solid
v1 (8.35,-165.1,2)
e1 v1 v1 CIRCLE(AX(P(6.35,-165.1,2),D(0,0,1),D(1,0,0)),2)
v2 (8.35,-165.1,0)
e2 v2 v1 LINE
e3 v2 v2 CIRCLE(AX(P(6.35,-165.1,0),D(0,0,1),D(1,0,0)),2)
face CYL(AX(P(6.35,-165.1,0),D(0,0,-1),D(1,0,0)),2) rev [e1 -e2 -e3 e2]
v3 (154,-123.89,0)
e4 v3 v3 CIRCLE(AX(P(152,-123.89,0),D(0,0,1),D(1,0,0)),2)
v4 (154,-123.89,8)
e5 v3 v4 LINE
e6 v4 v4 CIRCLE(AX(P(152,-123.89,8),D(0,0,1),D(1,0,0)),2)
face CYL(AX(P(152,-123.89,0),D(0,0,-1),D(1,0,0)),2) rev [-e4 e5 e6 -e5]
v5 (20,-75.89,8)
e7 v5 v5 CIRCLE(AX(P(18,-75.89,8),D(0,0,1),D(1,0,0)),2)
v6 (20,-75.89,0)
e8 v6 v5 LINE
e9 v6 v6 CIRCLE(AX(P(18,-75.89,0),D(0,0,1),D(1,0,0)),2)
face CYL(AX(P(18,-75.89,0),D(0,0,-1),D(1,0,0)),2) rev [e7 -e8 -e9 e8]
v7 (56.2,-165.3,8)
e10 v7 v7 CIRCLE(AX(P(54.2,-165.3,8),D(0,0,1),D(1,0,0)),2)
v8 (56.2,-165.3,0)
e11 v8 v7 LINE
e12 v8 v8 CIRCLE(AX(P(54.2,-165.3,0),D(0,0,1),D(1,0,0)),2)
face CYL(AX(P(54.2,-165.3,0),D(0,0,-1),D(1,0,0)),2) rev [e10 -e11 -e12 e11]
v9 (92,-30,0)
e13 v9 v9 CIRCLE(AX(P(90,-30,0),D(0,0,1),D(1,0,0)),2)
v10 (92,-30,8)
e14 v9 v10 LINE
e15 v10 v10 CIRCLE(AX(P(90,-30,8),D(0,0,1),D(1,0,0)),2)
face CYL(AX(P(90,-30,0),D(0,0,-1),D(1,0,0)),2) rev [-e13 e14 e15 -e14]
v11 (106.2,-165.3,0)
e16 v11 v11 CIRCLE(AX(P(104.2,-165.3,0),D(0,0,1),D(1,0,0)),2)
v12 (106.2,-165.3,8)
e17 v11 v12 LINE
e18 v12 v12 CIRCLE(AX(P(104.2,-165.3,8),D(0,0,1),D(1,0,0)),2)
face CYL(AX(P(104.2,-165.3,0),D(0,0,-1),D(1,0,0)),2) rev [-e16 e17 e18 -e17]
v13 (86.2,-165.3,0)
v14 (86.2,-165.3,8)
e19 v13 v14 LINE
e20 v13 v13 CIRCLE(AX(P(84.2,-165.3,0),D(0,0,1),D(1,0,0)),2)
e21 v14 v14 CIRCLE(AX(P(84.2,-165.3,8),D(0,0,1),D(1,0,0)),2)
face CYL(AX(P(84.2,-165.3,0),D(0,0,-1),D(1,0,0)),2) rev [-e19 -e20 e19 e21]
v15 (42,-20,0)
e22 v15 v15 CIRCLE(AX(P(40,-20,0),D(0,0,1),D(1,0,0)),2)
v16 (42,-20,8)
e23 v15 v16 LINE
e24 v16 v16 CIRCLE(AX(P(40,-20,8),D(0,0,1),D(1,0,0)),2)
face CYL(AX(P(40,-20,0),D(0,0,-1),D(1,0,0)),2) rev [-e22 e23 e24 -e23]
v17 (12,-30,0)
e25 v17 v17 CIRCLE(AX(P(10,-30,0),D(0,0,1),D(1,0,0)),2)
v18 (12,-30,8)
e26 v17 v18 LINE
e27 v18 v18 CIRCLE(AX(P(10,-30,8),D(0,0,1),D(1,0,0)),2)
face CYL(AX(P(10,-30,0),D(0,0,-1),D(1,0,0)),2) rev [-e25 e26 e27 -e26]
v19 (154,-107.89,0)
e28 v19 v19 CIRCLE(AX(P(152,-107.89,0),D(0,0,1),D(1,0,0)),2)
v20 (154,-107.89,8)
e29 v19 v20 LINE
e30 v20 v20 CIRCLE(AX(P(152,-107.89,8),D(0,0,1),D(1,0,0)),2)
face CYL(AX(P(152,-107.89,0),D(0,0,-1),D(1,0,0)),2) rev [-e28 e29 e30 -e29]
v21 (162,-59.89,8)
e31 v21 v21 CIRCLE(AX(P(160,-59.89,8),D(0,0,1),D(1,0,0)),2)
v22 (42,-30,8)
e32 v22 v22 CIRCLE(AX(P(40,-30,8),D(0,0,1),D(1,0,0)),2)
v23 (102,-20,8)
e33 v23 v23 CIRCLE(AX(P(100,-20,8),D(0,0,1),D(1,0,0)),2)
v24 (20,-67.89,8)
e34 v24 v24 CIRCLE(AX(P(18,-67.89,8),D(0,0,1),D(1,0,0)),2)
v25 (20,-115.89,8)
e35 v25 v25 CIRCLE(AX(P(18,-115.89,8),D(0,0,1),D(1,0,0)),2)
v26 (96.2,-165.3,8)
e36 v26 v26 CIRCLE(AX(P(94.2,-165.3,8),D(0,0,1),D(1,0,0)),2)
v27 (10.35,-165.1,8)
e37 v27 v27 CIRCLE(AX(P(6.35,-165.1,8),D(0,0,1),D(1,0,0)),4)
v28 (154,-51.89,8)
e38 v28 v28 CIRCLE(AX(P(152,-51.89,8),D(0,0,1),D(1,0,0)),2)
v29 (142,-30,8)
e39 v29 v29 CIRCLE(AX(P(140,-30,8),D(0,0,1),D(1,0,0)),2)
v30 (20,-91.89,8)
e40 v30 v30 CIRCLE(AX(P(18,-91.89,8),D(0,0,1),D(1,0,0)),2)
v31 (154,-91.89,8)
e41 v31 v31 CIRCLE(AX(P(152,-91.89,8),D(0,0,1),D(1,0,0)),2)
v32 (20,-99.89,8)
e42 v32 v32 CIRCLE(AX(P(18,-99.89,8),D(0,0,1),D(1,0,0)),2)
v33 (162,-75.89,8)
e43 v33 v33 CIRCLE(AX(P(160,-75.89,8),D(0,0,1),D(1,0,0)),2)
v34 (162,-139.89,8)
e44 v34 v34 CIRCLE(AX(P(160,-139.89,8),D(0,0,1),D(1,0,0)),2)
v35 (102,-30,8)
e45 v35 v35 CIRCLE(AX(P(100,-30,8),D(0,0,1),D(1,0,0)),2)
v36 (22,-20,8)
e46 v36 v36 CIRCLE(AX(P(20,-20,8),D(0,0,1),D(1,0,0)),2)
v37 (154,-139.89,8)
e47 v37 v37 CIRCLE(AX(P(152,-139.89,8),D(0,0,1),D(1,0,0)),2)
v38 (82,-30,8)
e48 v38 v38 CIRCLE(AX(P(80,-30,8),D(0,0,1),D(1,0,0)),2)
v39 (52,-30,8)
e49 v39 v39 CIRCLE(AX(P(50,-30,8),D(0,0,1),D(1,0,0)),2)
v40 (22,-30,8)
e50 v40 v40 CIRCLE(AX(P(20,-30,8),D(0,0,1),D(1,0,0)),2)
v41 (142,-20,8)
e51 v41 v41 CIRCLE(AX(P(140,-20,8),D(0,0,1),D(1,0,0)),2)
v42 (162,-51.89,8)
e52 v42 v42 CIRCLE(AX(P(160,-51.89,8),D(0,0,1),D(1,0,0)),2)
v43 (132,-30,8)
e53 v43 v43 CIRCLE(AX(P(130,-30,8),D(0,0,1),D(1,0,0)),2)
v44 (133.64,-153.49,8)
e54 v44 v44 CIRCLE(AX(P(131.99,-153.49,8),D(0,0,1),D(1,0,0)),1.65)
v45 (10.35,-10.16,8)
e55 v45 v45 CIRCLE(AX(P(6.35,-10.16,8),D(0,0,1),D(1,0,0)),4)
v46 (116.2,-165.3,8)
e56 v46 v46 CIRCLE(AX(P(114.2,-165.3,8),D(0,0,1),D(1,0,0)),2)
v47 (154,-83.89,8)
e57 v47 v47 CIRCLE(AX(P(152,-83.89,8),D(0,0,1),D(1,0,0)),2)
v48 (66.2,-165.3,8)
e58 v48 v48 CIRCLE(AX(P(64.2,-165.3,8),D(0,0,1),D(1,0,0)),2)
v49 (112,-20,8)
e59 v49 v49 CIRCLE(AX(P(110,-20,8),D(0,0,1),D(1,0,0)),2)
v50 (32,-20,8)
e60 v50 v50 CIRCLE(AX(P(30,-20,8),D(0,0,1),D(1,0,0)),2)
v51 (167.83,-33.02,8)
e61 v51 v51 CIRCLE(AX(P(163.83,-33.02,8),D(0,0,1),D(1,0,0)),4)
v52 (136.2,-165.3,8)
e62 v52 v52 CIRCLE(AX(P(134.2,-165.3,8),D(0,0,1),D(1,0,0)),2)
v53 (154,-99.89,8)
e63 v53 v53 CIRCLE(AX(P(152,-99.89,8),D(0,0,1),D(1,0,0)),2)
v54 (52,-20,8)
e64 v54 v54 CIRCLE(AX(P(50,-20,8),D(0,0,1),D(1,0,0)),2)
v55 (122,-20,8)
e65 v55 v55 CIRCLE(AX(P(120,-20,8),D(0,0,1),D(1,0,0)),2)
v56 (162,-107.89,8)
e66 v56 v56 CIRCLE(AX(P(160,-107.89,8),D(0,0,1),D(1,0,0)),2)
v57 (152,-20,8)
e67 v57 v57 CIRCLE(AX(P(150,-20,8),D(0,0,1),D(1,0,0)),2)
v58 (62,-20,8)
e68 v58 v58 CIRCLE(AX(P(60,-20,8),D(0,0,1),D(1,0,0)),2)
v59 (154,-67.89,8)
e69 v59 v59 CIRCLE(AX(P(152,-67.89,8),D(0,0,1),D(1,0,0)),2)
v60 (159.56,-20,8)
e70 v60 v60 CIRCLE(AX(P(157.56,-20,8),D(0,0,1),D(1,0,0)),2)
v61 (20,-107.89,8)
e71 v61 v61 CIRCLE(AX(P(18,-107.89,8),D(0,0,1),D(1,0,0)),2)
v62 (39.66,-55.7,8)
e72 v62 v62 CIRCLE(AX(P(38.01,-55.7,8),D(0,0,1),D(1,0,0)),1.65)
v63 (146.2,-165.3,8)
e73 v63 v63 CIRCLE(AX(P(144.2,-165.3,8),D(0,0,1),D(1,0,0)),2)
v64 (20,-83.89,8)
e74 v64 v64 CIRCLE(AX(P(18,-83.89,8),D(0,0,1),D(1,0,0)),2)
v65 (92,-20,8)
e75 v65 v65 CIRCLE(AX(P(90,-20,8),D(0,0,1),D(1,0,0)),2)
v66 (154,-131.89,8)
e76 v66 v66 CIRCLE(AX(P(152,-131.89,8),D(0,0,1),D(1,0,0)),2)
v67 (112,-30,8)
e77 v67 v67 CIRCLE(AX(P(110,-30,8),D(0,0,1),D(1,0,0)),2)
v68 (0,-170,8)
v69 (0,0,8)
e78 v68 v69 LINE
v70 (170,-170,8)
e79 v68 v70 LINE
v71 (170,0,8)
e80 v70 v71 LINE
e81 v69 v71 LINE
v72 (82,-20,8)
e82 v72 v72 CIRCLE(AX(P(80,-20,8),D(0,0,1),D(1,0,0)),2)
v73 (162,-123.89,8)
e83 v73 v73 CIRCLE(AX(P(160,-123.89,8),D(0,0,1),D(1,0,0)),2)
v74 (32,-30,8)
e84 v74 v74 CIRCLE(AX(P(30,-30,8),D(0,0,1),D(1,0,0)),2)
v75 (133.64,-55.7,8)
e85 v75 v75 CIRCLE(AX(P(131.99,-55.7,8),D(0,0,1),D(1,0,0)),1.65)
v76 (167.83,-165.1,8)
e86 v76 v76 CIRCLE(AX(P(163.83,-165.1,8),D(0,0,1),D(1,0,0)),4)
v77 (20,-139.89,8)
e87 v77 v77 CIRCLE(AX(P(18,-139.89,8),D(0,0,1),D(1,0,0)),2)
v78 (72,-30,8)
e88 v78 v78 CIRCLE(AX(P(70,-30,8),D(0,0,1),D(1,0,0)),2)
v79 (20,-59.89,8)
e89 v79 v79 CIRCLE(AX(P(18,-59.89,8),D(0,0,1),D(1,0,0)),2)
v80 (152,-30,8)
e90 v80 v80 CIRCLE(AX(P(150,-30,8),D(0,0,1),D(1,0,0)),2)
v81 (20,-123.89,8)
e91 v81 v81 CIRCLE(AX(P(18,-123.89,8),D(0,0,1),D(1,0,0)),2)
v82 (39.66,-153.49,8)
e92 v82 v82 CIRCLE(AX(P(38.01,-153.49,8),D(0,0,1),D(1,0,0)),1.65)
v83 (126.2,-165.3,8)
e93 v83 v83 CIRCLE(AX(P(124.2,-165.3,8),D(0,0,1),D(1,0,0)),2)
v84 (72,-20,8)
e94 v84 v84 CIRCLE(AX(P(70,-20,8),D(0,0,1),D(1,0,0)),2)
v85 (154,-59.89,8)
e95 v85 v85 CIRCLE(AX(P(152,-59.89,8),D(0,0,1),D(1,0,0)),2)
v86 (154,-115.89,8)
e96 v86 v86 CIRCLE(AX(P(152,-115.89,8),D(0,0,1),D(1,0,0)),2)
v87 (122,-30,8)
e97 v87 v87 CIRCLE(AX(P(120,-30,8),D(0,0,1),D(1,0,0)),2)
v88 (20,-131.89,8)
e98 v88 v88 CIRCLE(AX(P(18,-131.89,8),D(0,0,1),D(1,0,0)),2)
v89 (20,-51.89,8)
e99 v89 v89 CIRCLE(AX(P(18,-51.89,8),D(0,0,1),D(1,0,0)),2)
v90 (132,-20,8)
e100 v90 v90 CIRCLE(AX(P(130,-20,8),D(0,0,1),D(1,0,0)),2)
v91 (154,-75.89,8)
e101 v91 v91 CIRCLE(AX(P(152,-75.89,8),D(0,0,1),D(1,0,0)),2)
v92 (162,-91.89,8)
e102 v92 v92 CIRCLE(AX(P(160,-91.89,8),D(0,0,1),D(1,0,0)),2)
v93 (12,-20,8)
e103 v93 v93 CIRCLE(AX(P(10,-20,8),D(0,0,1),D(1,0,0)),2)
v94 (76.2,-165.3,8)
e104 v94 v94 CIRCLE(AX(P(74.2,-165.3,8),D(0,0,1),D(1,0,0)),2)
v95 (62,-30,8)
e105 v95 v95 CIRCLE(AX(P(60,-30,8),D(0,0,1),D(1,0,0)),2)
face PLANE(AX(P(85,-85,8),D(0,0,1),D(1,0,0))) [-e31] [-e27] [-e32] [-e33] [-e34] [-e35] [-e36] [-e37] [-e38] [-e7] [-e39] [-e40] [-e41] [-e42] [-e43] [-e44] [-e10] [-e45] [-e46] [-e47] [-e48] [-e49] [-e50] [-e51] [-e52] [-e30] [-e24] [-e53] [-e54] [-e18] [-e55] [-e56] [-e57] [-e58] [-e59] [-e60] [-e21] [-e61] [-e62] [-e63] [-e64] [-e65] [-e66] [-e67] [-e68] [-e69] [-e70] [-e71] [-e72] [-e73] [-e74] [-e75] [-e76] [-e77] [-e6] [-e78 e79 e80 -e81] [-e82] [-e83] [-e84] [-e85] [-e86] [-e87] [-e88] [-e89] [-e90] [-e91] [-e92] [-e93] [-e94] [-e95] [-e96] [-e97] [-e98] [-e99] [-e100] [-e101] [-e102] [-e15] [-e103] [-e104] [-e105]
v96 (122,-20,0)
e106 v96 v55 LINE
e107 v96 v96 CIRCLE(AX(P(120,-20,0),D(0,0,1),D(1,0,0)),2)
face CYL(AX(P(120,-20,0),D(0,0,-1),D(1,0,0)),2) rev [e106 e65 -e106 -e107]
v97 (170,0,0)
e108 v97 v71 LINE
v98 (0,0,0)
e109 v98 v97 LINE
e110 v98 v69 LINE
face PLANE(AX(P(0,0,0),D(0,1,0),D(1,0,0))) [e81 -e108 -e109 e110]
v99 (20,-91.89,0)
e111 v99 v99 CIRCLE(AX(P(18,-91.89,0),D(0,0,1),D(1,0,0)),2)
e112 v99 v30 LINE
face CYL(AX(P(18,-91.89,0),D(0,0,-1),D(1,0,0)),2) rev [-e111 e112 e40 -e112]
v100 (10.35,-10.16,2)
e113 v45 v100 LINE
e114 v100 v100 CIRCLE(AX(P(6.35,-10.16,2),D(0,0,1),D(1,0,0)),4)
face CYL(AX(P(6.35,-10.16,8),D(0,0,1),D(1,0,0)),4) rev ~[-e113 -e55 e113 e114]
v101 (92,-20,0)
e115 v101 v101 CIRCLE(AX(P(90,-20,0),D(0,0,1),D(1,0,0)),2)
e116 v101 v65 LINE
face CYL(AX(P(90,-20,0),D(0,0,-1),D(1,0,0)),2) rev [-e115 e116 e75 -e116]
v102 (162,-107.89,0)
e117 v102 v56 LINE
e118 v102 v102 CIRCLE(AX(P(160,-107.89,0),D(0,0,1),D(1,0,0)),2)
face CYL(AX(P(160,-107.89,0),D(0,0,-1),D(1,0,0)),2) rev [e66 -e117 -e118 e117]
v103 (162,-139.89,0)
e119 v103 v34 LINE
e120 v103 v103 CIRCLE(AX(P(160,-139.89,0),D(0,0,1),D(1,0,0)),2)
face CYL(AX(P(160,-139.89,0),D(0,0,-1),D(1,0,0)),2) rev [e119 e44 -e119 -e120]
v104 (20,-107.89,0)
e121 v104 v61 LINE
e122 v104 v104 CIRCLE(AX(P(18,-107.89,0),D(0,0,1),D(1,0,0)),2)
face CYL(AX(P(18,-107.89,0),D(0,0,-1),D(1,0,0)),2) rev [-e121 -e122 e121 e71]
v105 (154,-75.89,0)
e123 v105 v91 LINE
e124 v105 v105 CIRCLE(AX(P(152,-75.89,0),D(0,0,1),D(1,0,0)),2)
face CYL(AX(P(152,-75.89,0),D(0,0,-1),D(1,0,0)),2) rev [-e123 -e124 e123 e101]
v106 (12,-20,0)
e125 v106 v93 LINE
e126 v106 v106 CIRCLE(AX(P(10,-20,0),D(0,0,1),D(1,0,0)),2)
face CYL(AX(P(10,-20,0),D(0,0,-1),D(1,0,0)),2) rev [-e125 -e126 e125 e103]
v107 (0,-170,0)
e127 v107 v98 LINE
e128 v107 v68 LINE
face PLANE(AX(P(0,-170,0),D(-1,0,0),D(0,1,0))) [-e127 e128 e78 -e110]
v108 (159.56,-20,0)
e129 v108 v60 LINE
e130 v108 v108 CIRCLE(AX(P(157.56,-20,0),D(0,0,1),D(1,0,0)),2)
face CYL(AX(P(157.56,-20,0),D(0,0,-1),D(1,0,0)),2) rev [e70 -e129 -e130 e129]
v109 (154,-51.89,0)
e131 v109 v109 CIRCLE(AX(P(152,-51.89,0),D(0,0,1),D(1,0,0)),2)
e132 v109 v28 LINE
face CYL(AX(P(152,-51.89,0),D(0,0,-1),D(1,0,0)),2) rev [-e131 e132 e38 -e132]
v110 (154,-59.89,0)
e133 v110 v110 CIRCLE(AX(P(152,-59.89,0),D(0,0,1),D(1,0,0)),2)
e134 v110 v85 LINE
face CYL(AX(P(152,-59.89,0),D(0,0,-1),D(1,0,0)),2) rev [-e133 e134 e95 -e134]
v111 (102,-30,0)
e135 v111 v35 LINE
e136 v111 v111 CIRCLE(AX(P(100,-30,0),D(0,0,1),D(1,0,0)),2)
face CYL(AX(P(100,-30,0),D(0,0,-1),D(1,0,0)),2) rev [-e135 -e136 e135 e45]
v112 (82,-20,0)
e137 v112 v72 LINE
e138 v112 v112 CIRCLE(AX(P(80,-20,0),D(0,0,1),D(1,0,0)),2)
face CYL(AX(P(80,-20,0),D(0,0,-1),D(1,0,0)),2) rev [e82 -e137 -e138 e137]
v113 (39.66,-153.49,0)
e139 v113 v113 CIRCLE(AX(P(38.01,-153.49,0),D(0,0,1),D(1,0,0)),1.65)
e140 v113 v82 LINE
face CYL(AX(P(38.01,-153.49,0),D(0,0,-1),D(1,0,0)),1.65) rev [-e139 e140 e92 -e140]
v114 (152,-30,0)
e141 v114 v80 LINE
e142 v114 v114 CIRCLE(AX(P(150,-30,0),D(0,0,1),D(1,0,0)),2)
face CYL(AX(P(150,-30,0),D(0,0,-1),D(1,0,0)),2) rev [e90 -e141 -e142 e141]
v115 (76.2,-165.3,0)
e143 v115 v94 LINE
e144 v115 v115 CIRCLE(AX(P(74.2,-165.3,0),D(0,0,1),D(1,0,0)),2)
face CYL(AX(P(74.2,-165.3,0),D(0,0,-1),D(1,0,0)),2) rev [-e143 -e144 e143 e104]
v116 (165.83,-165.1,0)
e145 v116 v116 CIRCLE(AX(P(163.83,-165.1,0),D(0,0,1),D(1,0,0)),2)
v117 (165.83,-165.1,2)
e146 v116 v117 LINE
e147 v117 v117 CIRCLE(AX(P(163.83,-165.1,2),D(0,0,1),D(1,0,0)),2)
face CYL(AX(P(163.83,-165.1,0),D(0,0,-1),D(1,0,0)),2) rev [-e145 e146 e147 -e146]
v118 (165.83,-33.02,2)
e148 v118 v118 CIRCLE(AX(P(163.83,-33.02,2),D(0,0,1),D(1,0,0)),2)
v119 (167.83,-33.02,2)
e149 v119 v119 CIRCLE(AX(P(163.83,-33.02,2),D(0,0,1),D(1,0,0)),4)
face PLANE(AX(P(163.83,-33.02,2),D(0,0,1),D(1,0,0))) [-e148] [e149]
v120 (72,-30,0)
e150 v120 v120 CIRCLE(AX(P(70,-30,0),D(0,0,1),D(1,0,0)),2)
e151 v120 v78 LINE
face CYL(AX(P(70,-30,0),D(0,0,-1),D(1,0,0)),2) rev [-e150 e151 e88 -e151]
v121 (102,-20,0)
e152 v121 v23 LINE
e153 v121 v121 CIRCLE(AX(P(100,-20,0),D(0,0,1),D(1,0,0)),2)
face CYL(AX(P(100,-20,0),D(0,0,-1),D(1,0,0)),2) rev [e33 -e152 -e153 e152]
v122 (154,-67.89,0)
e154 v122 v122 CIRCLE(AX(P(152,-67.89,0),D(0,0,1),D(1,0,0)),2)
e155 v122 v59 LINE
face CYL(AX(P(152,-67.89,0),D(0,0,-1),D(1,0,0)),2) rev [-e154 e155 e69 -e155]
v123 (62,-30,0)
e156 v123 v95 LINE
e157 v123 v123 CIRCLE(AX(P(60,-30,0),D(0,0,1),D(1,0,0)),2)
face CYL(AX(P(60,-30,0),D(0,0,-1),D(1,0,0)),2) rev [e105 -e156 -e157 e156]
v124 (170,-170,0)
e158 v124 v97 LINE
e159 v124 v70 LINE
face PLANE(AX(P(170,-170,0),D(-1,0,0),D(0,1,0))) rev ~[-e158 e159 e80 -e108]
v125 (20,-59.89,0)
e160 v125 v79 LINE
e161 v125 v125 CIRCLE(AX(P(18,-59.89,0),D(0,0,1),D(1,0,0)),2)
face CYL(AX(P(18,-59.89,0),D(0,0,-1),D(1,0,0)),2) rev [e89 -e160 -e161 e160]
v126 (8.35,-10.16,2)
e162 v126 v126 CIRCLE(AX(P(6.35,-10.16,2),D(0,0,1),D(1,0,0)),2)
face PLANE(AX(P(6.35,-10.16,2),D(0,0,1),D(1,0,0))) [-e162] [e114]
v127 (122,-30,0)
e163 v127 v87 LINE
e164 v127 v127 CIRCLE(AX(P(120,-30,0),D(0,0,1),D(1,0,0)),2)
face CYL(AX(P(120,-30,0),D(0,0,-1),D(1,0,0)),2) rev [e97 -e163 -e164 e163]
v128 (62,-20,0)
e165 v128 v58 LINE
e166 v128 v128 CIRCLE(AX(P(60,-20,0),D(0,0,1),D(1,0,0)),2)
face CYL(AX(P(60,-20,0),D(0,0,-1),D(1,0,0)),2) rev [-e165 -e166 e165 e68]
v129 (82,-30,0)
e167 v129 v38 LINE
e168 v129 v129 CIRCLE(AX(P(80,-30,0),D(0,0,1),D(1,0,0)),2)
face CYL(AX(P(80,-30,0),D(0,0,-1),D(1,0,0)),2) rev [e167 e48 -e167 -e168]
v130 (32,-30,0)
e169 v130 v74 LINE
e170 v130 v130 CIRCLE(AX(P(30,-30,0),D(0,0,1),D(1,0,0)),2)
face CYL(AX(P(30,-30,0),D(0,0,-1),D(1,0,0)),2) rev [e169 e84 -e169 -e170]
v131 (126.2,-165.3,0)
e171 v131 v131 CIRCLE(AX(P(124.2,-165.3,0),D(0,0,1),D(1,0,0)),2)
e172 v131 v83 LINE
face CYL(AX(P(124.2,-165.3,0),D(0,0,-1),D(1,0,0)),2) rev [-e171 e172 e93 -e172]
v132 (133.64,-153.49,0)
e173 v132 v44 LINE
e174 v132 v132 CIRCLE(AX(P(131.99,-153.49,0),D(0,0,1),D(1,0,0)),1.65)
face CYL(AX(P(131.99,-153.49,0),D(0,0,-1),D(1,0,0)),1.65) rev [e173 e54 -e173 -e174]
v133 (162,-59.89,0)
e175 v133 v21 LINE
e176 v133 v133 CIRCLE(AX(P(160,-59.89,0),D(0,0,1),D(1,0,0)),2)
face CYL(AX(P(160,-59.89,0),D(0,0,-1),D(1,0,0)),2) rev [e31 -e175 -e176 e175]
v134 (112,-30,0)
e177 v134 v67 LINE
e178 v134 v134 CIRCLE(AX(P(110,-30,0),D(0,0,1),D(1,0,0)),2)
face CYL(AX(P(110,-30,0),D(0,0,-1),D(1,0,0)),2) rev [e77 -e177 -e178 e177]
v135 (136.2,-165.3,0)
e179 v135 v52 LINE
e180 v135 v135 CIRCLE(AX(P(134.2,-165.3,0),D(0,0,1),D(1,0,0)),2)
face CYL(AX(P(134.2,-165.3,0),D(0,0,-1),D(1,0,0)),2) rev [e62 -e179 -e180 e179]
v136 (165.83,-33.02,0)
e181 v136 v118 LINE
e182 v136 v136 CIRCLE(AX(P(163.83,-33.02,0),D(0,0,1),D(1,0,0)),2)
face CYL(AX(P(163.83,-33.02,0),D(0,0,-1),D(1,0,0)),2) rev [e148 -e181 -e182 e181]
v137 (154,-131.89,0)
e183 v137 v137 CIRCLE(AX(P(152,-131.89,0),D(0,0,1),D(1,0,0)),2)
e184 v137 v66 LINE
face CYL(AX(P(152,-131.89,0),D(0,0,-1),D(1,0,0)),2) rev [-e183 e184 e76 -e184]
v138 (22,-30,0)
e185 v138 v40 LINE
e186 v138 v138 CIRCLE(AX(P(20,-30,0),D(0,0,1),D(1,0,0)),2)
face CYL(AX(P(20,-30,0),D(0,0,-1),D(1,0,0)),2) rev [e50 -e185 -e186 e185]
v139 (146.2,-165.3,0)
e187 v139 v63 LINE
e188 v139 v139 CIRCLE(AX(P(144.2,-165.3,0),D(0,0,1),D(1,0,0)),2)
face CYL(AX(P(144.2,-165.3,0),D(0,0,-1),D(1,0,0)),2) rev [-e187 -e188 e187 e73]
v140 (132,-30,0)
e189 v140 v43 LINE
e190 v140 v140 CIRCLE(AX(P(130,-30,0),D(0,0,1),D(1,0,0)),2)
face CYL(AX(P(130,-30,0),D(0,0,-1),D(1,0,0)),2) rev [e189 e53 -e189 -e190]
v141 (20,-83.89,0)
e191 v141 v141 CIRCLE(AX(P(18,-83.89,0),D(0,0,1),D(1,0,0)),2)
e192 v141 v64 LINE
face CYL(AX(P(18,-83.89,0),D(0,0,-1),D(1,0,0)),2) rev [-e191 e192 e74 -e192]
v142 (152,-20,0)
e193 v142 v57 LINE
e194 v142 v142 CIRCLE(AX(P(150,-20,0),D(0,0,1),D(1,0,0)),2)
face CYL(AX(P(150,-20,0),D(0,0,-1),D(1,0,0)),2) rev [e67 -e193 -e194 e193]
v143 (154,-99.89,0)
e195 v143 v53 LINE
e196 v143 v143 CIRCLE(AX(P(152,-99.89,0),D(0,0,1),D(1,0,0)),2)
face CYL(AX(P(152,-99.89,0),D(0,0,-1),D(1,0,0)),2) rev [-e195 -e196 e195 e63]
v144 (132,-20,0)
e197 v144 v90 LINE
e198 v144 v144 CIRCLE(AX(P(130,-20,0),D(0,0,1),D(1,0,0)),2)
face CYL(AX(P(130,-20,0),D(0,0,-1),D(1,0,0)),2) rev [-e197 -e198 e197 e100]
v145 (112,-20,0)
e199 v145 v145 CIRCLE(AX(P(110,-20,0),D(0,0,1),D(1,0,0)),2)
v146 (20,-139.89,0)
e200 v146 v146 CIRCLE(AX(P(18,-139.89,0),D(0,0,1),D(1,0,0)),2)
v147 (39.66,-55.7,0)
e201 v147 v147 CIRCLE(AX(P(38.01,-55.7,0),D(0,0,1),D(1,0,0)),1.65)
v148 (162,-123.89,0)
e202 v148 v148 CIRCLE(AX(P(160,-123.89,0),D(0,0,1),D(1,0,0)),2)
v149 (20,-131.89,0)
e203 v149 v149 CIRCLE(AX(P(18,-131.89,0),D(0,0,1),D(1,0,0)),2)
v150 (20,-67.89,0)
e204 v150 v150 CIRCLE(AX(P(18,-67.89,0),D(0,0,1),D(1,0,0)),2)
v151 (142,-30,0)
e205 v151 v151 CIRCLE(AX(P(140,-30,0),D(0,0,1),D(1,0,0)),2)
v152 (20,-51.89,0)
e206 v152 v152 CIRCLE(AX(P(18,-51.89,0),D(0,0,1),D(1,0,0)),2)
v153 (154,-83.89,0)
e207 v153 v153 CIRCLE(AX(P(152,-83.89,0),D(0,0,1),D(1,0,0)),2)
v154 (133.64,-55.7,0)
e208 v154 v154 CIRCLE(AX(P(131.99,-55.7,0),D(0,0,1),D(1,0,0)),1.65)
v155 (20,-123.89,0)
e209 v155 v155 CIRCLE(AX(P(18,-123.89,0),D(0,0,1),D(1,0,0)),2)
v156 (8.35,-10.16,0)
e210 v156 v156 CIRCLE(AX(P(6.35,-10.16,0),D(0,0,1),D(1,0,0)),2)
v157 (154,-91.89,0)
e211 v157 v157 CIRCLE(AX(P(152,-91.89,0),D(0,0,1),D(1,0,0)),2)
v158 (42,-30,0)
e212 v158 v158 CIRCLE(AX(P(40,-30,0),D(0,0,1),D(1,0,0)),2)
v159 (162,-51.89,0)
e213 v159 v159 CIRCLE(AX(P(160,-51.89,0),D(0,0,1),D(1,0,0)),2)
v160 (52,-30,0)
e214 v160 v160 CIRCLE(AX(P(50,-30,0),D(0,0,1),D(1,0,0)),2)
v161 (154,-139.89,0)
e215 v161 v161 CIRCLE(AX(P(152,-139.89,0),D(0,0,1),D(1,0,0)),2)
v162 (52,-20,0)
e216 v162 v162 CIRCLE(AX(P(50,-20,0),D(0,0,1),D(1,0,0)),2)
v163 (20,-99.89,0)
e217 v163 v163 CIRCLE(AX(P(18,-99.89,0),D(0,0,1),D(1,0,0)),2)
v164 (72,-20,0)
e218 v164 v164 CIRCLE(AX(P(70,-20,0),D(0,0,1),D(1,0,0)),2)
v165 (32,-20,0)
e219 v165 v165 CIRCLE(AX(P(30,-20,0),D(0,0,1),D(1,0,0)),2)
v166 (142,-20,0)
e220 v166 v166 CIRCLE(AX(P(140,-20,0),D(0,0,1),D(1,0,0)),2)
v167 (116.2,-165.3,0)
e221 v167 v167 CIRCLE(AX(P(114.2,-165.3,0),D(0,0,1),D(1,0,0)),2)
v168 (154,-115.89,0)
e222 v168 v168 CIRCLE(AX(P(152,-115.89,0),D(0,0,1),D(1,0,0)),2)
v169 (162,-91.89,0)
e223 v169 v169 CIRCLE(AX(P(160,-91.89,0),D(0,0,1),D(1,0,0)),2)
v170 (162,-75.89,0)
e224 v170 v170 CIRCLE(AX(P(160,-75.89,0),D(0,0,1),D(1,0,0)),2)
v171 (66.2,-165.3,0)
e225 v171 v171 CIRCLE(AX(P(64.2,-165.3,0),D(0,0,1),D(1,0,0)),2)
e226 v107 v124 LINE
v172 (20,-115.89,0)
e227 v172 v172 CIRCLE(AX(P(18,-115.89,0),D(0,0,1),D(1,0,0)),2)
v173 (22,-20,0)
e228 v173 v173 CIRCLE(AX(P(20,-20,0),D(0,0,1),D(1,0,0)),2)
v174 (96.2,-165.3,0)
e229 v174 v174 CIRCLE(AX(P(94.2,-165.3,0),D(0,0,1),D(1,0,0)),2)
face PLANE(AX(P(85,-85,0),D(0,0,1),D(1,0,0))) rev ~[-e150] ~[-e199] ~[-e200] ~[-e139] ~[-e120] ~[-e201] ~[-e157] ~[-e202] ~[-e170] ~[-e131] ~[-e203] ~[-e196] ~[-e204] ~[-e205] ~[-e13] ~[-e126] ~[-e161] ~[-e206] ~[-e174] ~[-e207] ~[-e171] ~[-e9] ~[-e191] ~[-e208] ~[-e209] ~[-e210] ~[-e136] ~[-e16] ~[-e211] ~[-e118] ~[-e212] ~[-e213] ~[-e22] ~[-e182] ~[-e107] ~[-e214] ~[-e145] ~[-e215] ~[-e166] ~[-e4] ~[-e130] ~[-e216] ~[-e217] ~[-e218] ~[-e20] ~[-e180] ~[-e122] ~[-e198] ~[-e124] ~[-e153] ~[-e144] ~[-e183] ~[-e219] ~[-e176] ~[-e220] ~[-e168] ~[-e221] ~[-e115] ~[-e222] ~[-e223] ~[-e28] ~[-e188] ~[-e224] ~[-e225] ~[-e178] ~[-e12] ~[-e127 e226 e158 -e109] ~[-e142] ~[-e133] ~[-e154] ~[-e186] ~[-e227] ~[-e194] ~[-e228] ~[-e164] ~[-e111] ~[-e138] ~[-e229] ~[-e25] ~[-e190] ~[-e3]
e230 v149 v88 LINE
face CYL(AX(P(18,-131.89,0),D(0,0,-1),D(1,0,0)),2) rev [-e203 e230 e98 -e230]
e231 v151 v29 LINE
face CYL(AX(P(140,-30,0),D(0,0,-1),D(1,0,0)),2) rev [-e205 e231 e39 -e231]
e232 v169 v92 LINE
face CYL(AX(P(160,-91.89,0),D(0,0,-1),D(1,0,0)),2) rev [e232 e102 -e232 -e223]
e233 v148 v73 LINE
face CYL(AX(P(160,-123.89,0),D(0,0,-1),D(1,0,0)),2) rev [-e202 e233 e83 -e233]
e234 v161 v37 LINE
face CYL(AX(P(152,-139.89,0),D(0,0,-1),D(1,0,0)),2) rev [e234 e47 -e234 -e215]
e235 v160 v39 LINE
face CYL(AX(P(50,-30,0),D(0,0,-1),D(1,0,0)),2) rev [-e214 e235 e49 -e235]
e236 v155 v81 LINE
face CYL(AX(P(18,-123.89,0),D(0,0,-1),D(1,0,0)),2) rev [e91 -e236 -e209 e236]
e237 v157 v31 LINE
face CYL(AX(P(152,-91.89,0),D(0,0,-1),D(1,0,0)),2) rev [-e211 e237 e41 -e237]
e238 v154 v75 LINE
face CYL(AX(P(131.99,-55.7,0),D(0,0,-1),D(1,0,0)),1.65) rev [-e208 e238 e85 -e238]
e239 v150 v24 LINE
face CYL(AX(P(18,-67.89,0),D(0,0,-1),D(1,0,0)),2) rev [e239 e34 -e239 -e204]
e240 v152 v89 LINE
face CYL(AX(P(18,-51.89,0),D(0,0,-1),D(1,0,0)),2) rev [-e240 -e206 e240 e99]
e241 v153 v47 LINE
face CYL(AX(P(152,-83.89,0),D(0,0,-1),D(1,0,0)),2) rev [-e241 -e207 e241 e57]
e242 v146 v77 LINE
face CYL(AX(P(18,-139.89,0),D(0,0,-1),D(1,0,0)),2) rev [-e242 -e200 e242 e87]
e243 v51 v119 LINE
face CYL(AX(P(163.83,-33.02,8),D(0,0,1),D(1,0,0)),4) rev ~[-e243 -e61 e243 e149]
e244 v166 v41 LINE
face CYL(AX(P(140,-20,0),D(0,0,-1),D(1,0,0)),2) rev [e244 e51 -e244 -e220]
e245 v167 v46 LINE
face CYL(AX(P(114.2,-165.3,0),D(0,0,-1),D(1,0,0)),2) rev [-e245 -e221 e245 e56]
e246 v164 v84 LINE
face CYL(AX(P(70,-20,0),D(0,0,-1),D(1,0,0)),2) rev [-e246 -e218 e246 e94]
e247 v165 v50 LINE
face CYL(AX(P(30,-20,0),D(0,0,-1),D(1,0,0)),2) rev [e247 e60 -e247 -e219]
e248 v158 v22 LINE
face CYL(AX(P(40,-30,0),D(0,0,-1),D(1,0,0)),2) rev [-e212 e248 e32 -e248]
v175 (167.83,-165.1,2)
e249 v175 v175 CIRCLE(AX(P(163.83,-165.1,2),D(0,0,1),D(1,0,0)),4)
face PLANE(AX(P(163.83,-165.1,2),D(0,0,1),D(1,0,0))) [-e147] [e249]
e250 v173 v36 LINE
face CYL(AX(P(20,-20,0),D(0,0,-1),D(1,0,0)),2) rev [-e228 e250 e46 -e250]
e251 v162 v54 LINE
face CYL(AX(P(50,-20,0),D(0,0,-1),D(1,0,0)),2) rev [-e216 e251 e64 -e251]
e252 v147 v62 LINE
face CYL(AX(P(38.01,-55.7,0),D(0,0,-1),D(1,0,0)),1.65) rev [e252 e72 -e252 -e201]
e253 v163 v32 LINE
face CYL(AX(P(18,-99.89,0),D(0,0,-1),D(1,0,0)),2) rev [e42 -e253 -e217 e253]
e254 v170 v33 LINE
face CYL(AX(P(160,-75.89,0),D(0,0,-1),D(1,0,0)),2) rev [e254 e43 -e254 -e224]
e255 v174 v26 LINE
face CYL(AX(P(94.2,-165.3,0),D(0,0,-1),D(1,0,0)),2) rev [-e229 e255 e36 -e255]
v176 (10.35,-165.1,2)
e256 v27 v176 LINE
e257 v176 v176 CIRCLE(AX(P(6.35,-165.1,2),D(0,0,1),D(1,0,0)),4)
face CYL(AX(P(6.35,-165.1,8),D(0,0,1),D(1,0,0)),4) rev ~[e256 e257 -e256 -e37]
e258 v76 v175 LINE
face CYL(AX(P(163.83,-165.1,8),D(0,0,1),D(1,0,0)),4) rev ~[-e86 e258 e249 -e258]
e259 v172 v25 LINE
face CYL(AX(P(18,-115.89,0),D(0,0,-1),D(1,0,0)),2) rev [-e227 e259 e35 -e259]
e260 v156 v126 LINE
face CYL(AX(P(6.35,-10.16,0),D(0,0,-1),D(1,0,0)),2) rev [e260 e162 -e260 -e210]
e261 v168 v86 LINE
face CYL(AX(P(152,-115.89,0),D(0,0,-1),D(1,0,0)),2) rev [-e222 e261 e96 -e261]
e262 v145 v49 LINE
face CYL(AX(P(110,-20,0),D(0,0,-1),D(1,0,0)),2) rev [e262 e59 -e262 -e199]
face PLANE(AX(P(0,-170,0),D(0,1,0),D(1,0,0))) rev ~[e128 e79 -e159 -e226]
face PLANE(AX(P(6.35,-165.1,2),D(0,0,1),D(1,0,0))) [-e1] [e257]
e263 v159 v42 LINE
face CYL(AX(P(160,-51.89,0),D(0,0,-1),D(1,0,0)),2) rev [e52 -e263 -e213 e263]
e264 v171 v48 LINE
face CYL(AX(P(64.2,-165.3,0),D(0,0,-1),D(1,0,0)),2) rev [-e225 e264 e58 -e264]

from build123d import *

# Parameters (mm, degrees)
F0_W     = 170
F0_H     = 170
F0_R     = 2
F0_R_2   = 1.65
F1_DEPTH = 8
F2_R     = 4
F2_R_2   = 2
F3_DEPTH = 6


with BuildPart() as f1:
    # F0 (on Top) → F1 (new body)
    with BuildSketch(Plane.XY):
        with Locations((85, -85)):
            Rectangle(F0_W, F0_H)
        with Locations((6.35, -165.1)):
            Circle(F0_R, mode=Mode.SUBTRACT)
        with Locations((18, -139.89)):
            Circle(F0_R, mode=Mode.SUBTRACT)
        with Locations((18, -131.89)):
            Circle(F0_R, mode=Mode.SUBTRACT)
        with Locations((54.2, -165.3)):
            Circle(F0_R, mode=Mode.SUBTRACT)
        with Locations((64.2, -165.3)):
            Circle(F0_R, mode=Mode.SUBTRACT)
        with Locations((74.2, -165.3)):
            Circle(F0_R, mode=Mode.SUBTRACT)
        with Locations((38.01, -153.49)):
            Circle(F0_R_2, mode=Mode.SUBTRACT)
        with Locations((18, -123.89)):
            Circle(F0_R, mode=Mode.SUBTRACT)
        with Locations((18, -115.89)):
            Circle(F0_R, mode=Mode.SUBTRACT)
        with Locations((18, -107.89)):
            Circle(F0_R, mode=Mode.SUBTRACT)
        with Locations((18, -99.89)):
            Circle(F0_R, mode=Mode.SUBTRACT)
        with Locations((18, -91.89)):
            Circle(F0_R, mode=Mode.SUBTRACT)
        with Locations((18, -83.89)):
            Circle(F0_R, mode=Mode.SUBTRACT)
        with Locations((84.2, -165.3)):
            Circle(F0_R, mode=Mode.SUBTRACT)
        with Locations((94.2, -165.3)):
            Circle(F0_R, mode=Mode.SUBTRACT)
        with Locations((104.2, -165.3)):
            Circle(F0_R, mode=Mode.SUBTRACT)
        with Locations((114.2, -165.3)):
            Circle(F0_R, mode=Mode.SUBTRACT)
        with Locations((124.2, -165.3)):
            Circle(F0_R, mode=Mode.SUBTRACT)
        with Locations((134.2, -165.3)):
            Circle(F0_R, mode=Mode.SUBTRACT)
        with Locations((131.99, -153.49)):
            Circle(F0_R_2, mode=Mode.SUBTRACT)
        with Locations((144.2, -165.3)):
            Circle(F0_R, mode=Mode.SUBTRACT)
        with Locations((163.83, -165.1)):
            Circle(F0_R, mode=Mode.SUBTRACT)
        with Locations((152, -139.89)):
            Circle(F0_R, mode=Mode.SUBTRACT)
        with Locations((152, -131.89)):
            Circle(F0_R, mode=Mode.SUBTRACT)
        with Locations((160, -139.89)):
            Circle(F0_R, mode=Mode.SUBTRACT)
        with Locations((152, -123.89)):
            Circle(F0_R, mode=Mode.SUBTRACT)
        with Locations((160, -123.89)):
            Circle(F0_R, mode=Mode.SUBTRACT)
        with Locations((152, -115.89)):
            Circle(F0_R, mode=Mode.SUBTRACT)
        with Locations((152, -107.89)):
            Circle(F0_R, mode=Mode.SUBTRACT)
        with Locations((160, -107.89)):
            Circle(F0_R, mode=Mode.SUBTRACT)
        with Locations((152, -99.89)):
            Circle(F0_R, mode=Mode.SUBTRACT)
        with Locations((152, -91.89)):
            Circle(F0_R, mode=Mode.SUBTRACT)
        with Locations((152, -83.89)):
            Circle(F0_R, mode=Mode.SUBTRACT)
        with Locations((160, -91.89)):
            Circle(F0_R, mode=Mode.SUBTRACT)
        with Locations((18, -75.89)):
            Circle(F0_R, mode=Mode.SUBTRACT)
        with Locations((18, -67.89)):
            Circle(F0_R, mode=Mode.SUBTRACT)
        with Locations((18, -59.89)):
            Circle(F0_R, mode=Mode.SUBTRACT)
        with Locations((18, -51.89)):
            Circle(F0_R, mode=Mode.SUBTRACT)
        with Locations((38.01, -55.7)):
            Circle(F0_R_2, mode=Mode.SUBTRACT)
        with Locations((10, -30)):
            Circle(F0_R, mode=Mode.SUBTRACT)
        with Locations((20, -30)):
            Circle(F0_R, mode=Mode.SUBTRACT)
        with Locations((10, -20)):
            Circle(F0_R, mode=Mode.SUBTRACT)
        with Locations((20, -20)):
            Circle(F0_R, mode=Mode.SUBTRACT)
        with Locations((6.35, -10.16)):
            Circle(F0_R, mode=Mode.SUBTRACT)
        with Locations((30, -30)):
            Circle(F0_R, mode=Mode.SUBTRACT)
        with Locations((30, -20)):
            Circle(F0_R, mode=Mode.SUBTRACT)
        with Locations((40, -30)):
            Circle(F0_R, mode=Mode.SUBTRACT)
        with Locations((50, -30)):
            Circle(F0_R, mode=Mode.SUBTRACT)
        with Locations((40, -20)):
            Circle(F0_R, mode=Mode.SUBTRACT)
        with Locations((50, -20)):
            Circle(F0_R, mode=Mode.SUBTRACT)
        with Locations((60, -30)):
            Circle(F0_R, mode=Mode.SUBTRACT)
        with Locations((60, -20)):
            Circle(F0_R, mode=Mode.SUBTRACT)
        with Locations((70, -30)):
            Circle(F0_R, mode=Mode.SUBTRACT)
        with Locations((80, -30)):
            Circle(F0_R, mode=Mode.SUBTRACT)
        with Locations((70, -20)):
            Circle(F0_R, mode=Mode.SUBTRACT)
        with Locations((80, -20)):
            Circle(F0_R, mode=Mode.SUBTRACT)
        with Locations((131.99, -55.7)):
            Circle(F0_R_2, mode=Mode.SUBTRACT)
        with Locations((152, -75.89)):
            Circle(F0_R, mode=Mode.SUBTRACT)
        with Locations((160, -75.89)):
            Circle(F0_R, mode=Mode.SUBTRACT)
        with Locations((152, -67.89)):
            Circle(F0_R, mode=Mode.SUBTRACT)
        with Locations((152, -59.89)):
            Circle(F0_R, mode=Mode.SUBTRACT)
        with Locations((160, -59.89)):
            Circle(F0_R, mode=Mode.SUBTRACT)
        with Locations((152, -51.89)):
            Circle(F0_R, mode=Mode.SUBTRACT)
        with Locations((160, -51.89)):
            Circle(F0_R, mode=Mode.SUBTRACT)
        with Locations((163.83, -33.02)):
            Circle(F0_R, mode=Mode.SUBTRACT)
        with Locations((90, -30)):
            Circle(F0_R, mode=Mode.SUBTRACT)
        with Locations((90, -20)):
            Circle(F0_R, mode=Mode.SUBTRACT)
        with Locations((100, -30)):
            Circle(F0_R, mode=Mode.SUBTRACT)
        with Locations((110, -30)):
            Circle(F0_R, mode=Mode.SUBTRACT)
        with Locations((100, -20)):
            Circle(F0_R, mode=Mode.SUBTRACT)
        with Locations((110, -20)):
            Circle(F0_R, mode=Mode.SUBTRACT)
        with Locations((120, -30)):
            Circle(F0_R, mode=Mode.SUBTRACT)
        with Locations((120, -20)):
            Circle(F0_R, mode=Mode.SUBTRACT)
        with Locations((130, -30)):
            Circle(F0_R, mode=Mode.SUBTRACT)
        with Locations((130, -20)):
            Circle(F0_R, mode=Mode.SUBTRACT)
        with Locations((140, -30)):
            Circle(F0_R, mode=Mode.SUBTRACT)
        with Locations((150, -30)):
            Circle(F0_R, mode=Mode.SUBTRACT)
        with Locations((140, -20)):
            Circle(F0_R, mode=Mode.SUBTRACT)
        with Locations((150, -20)):
            Circle(F0_R, mode=Mode.SUBTRACT)
        with Locations((157.560000028, -20)):
            Circle(F0_R, mode=Mode.SUBTRACT)
    extrude(amount=F1_DEPTH)

    # F2 (on face) → F3 (cut)
    with BuildSketch(Plane.XY.offset(8)):
        with Locations((163.83, -33.02)):
            Circle(F2_R)
        with Locations((163.83, -33.02)):
            Circle(F2_R_2, mode=Mode.SUBTRACT)
        with Locations((163.83, -165.1)):
            Circle(F2_R)
        with Locations((163.83, -165.1)):
            Circle(F2_R_2, mode=Mode.SUBTRACT)
        with Locations((6.35, -165.1)):
            Circle(F2_R)
        with Locations((6.35, -165.1)):
            Circle(F2_R_2, mode=Mode.SUBTRACT)
        with Locations((6.35, -10.16)):
            Circle(F2_R)
        with Locations((6.35, -10.16)):
            Circle(F2_R_2, mode=Mode.SUBTRACT)
    extrude(amount=-F3_DEPTH, mode=Mode.SUBTRACT)


solid = f1.part
